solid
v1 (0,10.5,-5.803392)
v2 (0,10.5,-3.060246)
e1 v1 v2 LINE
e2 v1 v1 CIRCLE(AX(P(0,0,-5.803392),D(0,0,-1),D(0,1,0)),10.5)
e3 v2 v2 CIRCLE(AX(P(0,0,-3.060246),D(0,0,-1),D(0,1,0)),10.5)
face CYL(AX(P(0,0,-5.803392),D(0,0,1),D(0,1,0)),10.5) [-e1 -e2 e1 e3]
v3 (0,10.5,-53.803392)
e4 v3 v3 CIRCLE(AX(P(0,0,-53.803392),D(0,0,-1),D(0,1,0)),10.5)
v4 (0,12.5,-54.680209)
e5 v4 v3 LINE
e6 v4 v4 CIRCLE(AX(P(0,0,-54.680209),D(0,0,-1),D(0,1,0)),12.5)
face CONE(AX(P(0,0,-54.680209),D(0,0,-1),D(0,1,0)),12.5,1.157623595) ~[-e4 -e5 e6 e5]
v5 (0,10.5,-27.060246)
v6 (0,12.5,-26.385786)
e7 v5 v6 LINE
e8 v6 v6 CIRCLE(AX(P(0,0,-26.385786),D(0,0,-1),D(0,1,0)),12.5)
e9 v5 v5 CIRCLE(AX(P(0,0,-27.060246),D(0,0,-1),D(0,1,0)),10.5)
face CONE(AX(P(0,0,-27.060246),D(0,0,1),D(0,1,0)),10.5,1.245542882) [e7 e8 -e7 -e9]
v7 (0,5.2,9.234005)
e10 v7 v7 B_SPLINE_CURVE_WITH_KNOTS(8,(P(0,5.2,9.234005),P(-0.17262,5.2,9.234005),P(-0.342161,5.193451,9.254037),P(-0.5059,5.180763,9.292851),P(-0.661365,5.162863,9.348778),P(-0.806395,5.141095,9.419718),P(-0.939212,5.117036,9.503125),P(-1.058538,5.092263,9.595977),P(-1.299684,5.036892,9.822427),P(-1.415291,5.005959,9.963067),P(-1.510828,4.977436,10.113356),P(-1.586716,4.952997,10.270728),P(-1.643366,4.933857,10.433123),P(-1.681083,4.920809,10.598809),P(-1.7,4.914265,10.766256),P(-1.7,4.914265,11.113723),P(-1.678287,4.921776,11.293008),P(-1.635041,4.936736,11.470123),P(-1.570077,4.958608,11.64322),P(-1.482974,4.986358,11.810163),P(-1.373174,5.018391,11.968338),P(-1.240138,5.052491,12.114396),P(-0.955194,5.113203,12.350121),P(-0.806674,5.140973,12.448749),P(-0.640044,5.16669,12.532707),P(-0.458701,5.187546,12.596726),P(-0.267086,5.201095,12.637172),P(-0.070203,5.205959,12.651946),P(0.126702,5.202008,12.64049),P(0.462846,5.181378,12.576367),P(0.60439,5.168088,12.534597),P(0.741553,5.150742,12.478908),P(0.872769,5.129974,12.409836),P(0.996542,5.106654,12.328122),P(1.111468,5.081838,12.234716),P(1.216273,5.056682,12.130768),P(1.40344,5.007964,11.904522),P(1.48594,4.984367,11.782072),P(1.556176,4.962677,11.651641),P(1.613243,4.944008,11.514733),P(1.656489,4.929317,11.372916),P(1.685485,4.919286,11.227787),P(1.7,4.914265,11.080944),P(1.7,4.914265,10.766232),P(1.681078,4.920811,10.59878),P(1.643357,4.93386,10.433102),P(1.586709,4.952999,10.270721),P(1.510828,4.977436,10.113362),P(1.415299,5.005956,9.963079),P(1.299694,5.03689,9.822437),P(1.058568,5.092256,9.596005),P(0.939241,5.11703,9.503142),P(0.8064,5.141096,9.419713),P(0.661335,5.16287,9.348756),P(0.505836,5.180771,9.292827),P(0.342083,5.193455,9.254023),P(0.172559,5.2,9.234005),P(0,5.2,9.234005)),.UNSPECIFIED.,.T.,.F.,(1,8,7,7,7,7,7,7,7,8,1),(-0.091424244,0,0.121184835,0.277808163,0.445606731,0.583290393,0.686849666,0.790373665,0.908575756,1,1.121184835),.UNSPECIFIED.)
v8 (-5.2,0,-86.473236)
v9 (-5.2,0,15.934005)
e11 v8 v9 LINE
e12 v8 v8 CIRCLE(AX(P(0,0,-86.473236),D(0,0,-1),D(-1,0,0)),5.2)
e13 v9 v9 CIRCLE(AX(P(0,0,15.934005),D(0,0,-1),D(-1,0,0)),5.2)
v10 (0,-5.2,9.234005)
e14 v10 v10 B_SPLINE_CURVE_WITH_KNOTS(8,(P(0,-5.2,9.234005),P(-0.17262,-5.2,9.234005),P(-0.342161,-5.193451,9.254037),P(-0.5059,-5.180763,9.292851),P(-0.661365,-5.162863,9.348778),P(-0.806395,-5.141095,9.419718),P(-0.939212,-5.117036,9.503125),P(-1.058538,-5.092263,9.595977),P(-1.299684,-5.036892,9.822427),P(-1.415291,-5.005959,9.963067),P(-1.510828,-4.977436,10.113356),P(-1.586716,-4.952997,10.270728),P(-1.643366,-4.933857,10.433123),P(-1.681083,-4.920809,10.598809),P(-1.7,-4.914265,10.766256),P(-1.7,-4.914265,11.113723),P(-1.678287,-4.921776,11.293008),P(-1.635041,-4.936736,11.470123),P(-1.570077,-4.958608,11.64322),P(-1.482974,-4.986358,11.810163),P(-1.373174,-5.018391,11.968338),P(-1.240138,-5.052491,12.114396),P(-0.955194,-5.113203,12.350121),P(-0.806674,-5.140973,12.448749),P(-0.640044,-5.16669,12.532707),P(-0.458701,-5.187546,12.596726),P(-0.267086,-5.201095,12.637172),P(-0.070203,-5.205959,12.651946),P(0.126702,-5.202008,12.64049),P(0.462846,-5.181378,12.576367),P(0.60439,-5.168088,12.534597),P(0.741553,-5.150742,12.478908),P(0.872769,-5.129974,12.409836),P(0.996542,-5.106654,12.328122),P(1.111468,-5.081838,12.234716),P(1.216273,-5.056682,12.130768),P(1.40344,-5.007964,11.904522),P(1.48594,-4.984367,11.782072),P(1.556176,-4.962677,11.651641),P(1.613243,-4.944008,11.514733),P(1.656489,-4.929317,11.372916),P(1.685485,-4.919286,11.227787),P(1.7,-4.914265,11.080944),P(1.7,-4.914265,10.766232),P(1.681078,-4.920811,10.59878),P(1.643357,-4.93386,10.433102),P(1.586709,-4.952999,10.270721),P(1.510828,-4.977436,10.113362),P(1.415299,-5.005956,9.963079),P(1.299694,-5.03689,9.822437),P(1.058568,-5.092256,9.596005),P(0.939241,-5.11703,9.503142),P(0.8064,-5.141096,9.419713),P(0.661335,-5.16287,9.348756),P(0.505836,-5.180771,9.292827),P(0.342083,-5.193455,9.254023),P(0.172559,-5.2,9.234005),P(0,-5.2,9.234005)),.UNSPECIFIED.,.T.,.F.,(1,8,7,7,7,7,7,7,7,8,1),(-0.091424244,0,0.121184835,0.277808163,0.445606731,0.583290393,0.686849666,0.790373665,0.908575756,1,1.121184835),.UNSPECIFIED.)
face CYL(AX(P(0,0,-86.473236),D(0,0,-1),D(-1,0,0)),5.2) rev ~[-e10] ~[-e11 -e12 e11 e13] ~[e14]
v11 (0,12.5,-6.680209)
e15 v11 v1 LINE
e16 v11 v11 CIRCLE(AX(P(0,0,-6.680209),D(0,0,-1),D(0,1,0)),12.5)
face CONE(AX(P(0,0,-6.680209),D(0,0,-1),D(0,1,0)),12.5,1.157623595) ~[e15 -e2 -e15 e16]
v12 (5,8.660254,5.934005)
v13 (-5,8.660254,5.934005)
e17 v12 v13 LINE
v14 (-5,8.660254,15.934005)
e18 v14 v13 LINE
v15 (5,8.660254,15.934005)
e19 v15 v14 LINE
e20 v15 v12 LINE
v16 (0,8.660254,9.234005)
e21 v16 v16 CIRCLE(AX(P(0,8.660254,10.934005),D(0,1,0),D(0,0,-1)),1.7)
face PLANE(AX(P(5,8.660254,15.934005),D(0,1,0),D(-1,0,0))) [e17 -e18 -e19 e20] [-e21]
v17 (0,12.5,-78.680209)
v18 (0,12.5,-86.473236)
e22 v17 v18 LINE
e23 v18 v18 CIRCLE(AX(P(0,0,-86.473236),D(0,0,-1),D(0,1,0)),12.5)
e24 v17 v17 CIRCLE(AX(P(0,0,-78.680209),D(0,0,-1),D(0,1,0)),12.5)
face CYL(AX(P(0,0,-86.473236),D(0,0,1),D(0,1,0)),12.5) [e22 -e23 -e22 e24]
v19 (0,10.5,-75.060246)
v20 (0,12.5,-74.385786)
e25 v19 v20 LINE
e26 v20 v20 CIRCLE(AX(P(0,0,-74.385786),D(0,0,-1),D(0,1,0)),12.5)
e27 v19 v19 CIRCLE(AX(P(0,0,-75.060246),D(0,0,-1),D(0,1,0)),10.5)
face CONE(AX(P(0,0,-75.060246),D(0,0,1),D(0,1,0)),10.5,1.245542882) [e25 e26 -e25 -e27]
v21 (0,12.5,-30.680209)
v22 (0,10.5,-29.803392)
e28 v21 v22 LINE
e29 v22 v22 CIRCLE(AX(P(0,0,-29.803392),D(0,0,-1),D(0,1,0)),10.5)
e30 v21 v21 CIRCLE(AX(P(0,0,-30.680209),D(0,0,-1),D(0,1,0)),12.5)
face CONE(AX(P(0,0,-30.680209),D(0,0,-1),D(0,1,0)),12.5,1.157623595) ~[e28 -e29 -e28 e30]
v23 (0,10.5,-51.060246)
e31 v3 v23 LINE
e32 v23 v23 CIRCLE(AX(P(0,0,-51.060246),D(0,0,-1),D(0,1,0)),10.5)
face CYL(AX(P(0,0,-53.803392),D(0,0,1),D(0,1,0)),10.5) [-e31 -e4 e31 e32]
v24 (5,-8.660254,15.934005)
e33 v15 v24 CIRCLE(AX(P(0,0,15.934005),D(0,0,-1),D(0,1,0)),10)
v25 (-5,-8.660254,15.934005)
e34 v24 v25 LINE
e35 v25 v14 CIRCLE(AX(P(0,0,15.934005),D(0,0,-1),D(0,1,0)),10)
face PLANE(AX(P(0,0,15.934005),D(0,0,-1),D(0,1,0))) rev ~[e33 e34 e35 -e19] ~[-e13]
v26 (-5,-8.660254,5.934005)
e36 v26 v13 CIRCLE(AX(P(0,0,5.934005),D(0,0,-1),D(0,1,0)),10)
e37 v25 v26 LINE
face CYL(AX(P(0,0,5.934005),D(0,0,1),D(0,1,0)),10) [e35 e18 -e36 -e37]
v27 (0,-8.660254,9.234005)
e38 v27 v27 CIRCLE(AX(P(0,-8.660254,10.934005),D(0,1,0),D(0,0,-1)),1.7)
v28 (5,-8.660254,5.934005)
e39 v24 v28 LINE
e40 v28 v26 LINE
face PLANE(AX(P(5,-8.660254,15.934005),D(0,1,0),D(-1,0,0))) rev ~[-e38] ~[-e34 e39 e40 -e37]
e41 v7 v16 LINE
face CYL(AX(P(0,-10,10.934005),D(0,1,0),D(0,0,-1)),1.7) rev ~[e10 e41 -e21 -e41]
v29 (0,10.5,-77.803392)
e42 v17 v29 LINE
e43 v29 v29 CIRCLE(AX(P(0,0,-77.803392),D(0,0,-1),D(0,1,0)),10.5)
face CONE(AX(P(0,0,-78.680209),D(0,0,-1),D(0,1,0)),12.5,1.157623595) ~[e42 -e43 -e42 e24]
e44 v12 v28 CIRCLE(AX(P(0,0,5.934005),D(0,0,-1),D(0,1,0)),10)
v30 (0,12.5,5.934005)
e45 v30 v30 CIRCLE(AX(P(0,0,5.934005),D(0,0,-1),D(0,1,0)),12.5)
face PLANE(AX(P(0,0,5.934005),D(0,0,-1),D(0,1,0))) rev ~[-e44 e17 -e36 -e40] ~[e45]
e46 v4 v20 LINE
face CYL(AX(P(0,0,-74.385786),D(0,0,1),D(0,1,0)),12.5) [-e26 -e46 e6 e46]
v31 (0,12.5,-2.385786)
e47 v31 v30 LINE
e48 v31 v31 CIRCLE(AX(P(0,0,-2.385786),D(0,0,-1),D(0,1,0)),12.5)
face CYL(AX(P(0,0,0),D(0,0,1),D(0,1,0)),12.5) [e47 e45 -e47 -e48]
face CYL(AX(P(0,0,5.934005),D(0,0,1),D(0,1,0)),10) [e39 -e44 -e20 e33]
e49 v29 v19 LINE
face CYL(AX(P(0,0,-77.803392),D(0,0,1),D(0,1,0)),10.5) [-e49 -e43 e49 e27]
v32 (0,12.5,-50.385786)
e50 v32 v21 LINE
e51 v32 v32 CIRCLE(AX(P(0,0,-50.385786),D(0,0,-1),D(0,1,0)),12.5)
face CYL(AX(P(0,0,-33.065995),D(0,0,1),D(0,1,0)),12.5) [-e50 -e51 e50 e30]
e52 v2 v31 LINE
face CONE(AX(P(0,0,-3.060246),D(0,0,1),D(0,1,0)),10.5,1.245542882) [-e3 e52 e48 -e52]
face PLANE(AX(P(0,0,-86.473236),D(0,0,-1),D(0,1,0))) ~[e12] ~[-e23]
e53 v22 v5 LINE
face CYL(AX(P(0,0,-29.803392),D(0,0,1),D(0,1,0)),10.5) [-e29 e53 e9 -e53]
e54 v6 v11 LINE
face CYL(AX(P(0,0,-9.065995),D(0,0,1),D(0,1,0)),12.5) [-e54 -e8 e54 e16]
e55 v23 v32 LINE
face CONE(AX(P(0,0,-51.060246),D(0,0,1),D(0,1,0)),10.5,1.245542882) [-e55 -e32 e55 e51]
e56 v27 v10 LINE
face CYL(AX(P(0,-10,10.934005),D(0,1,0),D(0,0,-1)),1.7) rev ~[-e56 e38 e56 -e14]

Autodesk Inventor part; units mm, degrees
ref_plane "YZ Plane" through (0, 0, 0) normal (1, 0, 0) x (0, 1, 0)
ref_plane "XY Plane" through (0, 0, 0) normal (0, 0, 1) x (1, 0, 0)
sketch "スケッチ1" plane through (0, 0, 0) normal (1, 0, 0) x (0, 1, 0)
  line L0 (0, -9.065995) -> (0, 0.934005)
  line L1 (0, 0) -> (12.5, 0)
  line L2 (12.5, 0) -> (12.5, -2.385786)
  line L3 (12.5, -2.385786) -> (10.5, -3.060246)
  line L4 (10.5, -3.060246) -> (10.5, -5.803392)
  line L5 (10.5, -5.803392) -> (12.5, -6.680209)
  line L6 (12.5, -6.680209) -> (12.5, -9.065995)
  line L7 (12.5, -9.065995) -> (0, -9.065995)
  line L8 (0, -9.065995) -> (0, 0)
  line L9 (10.5, -4.431819) -> (0, -4.532998)
  line L10 (10.5, -27.060246) -> (10.5, -29.803392)
  line L11 (12.5, -30.680209) -> (12.5, -33.065995)
  line L12 (10.5, -29.803392) -> (12.5, -30.680209)
  line L13 (12.5, -26.385786) -> (10.5, -27.060246)
  line L14 (12.5, -24) -> (12.5, -26.385786)
  line L15 (0, -24) -> (12.5, -24)
  line L16 (12.5, -33.065995) -> (0, -33.065995)
  line L17 (10.5, -28.431819) -> (0, -28.532998)
  line L18 (0, -33.065995) -> (0, -23.065995)
  line L19 (0, -33.065995) -> (0, -24)
  line L20 (10.5, -51.060246) -> (10.5, -53.803392)
  line L21 (12.5, -54.680209) -> (12.5, -57.065995)
  line L22 (10.5, -53.803392) -> (12.5, -54.680209)
  line L23 (12.5, -50.385786) -> (10.5, -51.060246)
  line L24 (12.5, -48) -> (12.5, -50.385786)
  line L25 (0, -48) -> (12.5, -48)
  line L26 (12.5, -57.065995) -> (0, -57.065995)
  line L27 (10.5, -52.431819) -> (0, -52.532998)
  line L28 (0, -57.065995) -> (0, -47.065995)
  line L29 (0, -57.065995) -> (0, -48)
  line L30 (10.5, -75.060246) -> (10.5, -77.803392)
  line L31 (12.5, -78.680209) -> (12.5, -81.065995)
  line L32 (10.5, -77.803392) -> (12.5, -78.680209)
  line L33 (12.5, -74.385786) -> (10.5, -75.060246)
  line L34 (12.5, -72) -> (12.5, -74.385786)
  line L35 (0, -72) -> (12.5, -72)
  line L36 (12.5, -81.065995) -> (0, -81.065995)
  line L37 (10.5, -76.431819) -> (0, -76.532998)
  line L38 (0, -81.065995) -> (0, -71.065995)
  line L39 (0, -81.065995) -> (0, -72)
  line L40 (0, -81.065995) -> (12.5, -81.065995)
  line L41 (12.5, -81.065995) -> (12.5, -86.473236)
  line L42 (12.5, -86.473236) -> (0, -86.473236)
  line L43 (0, -86.473236) -> (0, -81.065995)
  line L44 (12.5, -72) -> (12.5, -57.065995)
  line L45 (12.5, -48) -> (12.5, -33.065995)
  line L46 (12.5, -24) -> (12.5, -9.065995)
  line L47 (0, 0) -> (12.5, 0)
  line L48 (12.5, 0) -> (12.5, 5.934005)
  line L49 (12.5, 5.934005) -> (0, 5.934005)
  line L50 (0, 5.934005) -> (0, 0)
  line L51 (0, 5.934005) -> (10, 5.934005)
  line L52 (10, 5.934005) -> (10, 15.934005)
  line L53 (10, 15.934005) -> (0, 15.934005)
  line L54 (0, 15.934005) -> (0, 5.934005)
  line L55 (0, 15.934005) -> (0, -71.065995)
  circle A0 centre (12.5, -4.496449) radius 2
  point P0 (0, 0)
  point P1 (6.25, -86.473236)
  point P2 (0, -4.065995)
  point P3 (0, 0)
  point P4 (0, -23.065995)
  point P5 (0, -33.065995)
  point P6 (0, -47.065995)
  point P7 (0, -57.065995)
  point P8 (10, 5.934005)
  dimension "d1" = 2.74315
  dimension "d2" = 12.5
  dimension "d7" = 12.5
  dimension "d8" = 10
  dimension "d9" = 2.38579
  dimension "d10" = 2.38579
  dimension "d11" = 90
  dimension "d12" = 90
  dimension "d13" = 90
  dimension "d14" = 0
  dimension "d17" = 24
  dimension "d22" = 10
  dimension "d23" = 0
  dimension "d24" = 0
  dimension "d25" = 10
  dimension "d26" = 10
  dimension "d27" = 10
  dimension "d44" = 4
  dimension "d45" = 10.5
  dimension "d46" = 108.636
sketch "スケッチ1 outline for 回転1" plane through (0, 0, 0) normal (1, 0, 0) x (0, 1, 0)
  line L0 (10, 15.934005) -> (0, 15.934005)
  line L1 (10, 5.934005) -> (10, 15.934005)
  line L2 (12.5, 5.934005) -> (10, 5.934005)
  line L3 (12.5, 0) -> (12.5, 5.934005)
  line L4 (12.5, -2.385786) -> (12.5, 0)
  line L5 (10.5, -3.060246) -> (12.5, -2.385786)
  line L6 (10.5, -5.803392) -> (10.5, -3.060246)
  line L7 (12.5, -6.680209) -> (10.5, -5.803392)
  line L8 (12.5, -9.065995) -> (12.5, -6.680209)
  line L9 (12.5, -24) -> (12.5, -9.065995)
  line L10 (12.5, -26.385786) -> (12.5, -24)
  line L11 (10.5, -27.060246) -> (12.5, -26.385786)
  line L12 (10.5, -29.803392) -> (10.5, -27.060246)
  line L13 (12.5, -30.680209) -> (10.5, -29.803392)
  line L14 (12.5, -33.065995) -> (12.5, -30.680209)
  line L15 (12.5, -48) -> (12.5, -33.065995)
  line L16 (12.5, -50.385786) -> (12.5, -48)
  line L17 (10.5, -51.060246) -> (12.5, -50.385786)
  line L18 (10.5, -53.803392) -> (10.5, -51.060246)
  line L19 (12.5, -54.680209) -> (10.5, -53.803392)
  line L20 (12.5, -57.065995) -> (12.5, -54.680209)
  line L21 (12.5, -72) -> (12.5, -57.065995)
  line L22 (12.5, -74.385786) -> (12.5, -72)
  line L23 (10.5, -75.060246) -> (12.5, -74.385786)
  line L24 (10.5, -77.803392) -> (10.5, -75.060246)
  line L25 (12.5, -78.680209) -> (10.5, -77.803392)
  line L26 (12.5, -81.065995) -> (12.5, -78.680209)
  line L27 (12.5, -86.473236) -> (12.5, -81.065995)
  line L28 (0, -86.473236) -> (12.5, -86.473236)
  line L29 (0, -81.065995) -> (0, -86.473236)
  line L30 (0, -71.065995) -> (0, -81.065995)
  line L31 (0, -57.065995) -> (0, -71.065995)
  line L32 (0, -47.065995) -> (0, -57.065995)
  line L33 (0, -33.065995) -> (0, -47.065995)
  line L34 (0, -23.065995) -> (0, -33.065995)
  line L35 (0, -9.065995) -> (0, -23.065995)
  line L36 (0, 0) -> (0, -9.065995)
  line L37 (0, 5.934005) -> (0, 0)
  line L38 (0, 15.934005) -> (0, 5.934005)
revolve "回転1" add sketch "スケッチ1 outline for 回転1" angle 360 about axis through (0, 0, 15.934005) along (0, 0, -1)
sketch "スケッチ2" plane through (0, 0, -86.473236) normal (0, 0, -1) x (-1, 0, 0)
  circle A0 centre (0, 0) radius 5.2
  point P0 (0, 0)
  dimension "d29" = 10.4
extrude "押し出し1" cut sketch "スケッチ2" against normal through all
ref_plane "作業平面1" through (0, -10, 10.934005) normal (0, 1, 0) x (-1, 0, 0)
sketch "スケッチ3" plane through (0, -10, 10.934005) normal (0, 1, 0) x (-1, 0, 0)
  line L0 (-10, 5) -> (10, 5) projected
  point P0 (0, -10.934005)
  point P1 (0, 0)
  dimension "d32" = 5
hole "穴1" at (0, -10, 10.934005) direction (0, 1, 0) diameter 3.4 end through all
sketch "スケッチ4" plane through (0, 0, 15.934005) normal (0, 0, 1) x (1, 0, 0)
  circle A0 centre (0, 0) radius 10
  line L0 (5, -8.660254) -> (-5, -8.660254)
  line L1 (10, 0) -> (-10, 0)
  line L2 (5, 8.660254) -> (-5, 8.660254)
  point P0 (0, 0)
  dimension "d40" = 10
  dimension "d41" = 20
extrude "押し出し2" cut sketch "スケッチ4" against normal blind 10 contours L2 A0 | A0 L0
properties part number "ball_loading_v1_3DP_P_B" material "ABS プラスチック"
